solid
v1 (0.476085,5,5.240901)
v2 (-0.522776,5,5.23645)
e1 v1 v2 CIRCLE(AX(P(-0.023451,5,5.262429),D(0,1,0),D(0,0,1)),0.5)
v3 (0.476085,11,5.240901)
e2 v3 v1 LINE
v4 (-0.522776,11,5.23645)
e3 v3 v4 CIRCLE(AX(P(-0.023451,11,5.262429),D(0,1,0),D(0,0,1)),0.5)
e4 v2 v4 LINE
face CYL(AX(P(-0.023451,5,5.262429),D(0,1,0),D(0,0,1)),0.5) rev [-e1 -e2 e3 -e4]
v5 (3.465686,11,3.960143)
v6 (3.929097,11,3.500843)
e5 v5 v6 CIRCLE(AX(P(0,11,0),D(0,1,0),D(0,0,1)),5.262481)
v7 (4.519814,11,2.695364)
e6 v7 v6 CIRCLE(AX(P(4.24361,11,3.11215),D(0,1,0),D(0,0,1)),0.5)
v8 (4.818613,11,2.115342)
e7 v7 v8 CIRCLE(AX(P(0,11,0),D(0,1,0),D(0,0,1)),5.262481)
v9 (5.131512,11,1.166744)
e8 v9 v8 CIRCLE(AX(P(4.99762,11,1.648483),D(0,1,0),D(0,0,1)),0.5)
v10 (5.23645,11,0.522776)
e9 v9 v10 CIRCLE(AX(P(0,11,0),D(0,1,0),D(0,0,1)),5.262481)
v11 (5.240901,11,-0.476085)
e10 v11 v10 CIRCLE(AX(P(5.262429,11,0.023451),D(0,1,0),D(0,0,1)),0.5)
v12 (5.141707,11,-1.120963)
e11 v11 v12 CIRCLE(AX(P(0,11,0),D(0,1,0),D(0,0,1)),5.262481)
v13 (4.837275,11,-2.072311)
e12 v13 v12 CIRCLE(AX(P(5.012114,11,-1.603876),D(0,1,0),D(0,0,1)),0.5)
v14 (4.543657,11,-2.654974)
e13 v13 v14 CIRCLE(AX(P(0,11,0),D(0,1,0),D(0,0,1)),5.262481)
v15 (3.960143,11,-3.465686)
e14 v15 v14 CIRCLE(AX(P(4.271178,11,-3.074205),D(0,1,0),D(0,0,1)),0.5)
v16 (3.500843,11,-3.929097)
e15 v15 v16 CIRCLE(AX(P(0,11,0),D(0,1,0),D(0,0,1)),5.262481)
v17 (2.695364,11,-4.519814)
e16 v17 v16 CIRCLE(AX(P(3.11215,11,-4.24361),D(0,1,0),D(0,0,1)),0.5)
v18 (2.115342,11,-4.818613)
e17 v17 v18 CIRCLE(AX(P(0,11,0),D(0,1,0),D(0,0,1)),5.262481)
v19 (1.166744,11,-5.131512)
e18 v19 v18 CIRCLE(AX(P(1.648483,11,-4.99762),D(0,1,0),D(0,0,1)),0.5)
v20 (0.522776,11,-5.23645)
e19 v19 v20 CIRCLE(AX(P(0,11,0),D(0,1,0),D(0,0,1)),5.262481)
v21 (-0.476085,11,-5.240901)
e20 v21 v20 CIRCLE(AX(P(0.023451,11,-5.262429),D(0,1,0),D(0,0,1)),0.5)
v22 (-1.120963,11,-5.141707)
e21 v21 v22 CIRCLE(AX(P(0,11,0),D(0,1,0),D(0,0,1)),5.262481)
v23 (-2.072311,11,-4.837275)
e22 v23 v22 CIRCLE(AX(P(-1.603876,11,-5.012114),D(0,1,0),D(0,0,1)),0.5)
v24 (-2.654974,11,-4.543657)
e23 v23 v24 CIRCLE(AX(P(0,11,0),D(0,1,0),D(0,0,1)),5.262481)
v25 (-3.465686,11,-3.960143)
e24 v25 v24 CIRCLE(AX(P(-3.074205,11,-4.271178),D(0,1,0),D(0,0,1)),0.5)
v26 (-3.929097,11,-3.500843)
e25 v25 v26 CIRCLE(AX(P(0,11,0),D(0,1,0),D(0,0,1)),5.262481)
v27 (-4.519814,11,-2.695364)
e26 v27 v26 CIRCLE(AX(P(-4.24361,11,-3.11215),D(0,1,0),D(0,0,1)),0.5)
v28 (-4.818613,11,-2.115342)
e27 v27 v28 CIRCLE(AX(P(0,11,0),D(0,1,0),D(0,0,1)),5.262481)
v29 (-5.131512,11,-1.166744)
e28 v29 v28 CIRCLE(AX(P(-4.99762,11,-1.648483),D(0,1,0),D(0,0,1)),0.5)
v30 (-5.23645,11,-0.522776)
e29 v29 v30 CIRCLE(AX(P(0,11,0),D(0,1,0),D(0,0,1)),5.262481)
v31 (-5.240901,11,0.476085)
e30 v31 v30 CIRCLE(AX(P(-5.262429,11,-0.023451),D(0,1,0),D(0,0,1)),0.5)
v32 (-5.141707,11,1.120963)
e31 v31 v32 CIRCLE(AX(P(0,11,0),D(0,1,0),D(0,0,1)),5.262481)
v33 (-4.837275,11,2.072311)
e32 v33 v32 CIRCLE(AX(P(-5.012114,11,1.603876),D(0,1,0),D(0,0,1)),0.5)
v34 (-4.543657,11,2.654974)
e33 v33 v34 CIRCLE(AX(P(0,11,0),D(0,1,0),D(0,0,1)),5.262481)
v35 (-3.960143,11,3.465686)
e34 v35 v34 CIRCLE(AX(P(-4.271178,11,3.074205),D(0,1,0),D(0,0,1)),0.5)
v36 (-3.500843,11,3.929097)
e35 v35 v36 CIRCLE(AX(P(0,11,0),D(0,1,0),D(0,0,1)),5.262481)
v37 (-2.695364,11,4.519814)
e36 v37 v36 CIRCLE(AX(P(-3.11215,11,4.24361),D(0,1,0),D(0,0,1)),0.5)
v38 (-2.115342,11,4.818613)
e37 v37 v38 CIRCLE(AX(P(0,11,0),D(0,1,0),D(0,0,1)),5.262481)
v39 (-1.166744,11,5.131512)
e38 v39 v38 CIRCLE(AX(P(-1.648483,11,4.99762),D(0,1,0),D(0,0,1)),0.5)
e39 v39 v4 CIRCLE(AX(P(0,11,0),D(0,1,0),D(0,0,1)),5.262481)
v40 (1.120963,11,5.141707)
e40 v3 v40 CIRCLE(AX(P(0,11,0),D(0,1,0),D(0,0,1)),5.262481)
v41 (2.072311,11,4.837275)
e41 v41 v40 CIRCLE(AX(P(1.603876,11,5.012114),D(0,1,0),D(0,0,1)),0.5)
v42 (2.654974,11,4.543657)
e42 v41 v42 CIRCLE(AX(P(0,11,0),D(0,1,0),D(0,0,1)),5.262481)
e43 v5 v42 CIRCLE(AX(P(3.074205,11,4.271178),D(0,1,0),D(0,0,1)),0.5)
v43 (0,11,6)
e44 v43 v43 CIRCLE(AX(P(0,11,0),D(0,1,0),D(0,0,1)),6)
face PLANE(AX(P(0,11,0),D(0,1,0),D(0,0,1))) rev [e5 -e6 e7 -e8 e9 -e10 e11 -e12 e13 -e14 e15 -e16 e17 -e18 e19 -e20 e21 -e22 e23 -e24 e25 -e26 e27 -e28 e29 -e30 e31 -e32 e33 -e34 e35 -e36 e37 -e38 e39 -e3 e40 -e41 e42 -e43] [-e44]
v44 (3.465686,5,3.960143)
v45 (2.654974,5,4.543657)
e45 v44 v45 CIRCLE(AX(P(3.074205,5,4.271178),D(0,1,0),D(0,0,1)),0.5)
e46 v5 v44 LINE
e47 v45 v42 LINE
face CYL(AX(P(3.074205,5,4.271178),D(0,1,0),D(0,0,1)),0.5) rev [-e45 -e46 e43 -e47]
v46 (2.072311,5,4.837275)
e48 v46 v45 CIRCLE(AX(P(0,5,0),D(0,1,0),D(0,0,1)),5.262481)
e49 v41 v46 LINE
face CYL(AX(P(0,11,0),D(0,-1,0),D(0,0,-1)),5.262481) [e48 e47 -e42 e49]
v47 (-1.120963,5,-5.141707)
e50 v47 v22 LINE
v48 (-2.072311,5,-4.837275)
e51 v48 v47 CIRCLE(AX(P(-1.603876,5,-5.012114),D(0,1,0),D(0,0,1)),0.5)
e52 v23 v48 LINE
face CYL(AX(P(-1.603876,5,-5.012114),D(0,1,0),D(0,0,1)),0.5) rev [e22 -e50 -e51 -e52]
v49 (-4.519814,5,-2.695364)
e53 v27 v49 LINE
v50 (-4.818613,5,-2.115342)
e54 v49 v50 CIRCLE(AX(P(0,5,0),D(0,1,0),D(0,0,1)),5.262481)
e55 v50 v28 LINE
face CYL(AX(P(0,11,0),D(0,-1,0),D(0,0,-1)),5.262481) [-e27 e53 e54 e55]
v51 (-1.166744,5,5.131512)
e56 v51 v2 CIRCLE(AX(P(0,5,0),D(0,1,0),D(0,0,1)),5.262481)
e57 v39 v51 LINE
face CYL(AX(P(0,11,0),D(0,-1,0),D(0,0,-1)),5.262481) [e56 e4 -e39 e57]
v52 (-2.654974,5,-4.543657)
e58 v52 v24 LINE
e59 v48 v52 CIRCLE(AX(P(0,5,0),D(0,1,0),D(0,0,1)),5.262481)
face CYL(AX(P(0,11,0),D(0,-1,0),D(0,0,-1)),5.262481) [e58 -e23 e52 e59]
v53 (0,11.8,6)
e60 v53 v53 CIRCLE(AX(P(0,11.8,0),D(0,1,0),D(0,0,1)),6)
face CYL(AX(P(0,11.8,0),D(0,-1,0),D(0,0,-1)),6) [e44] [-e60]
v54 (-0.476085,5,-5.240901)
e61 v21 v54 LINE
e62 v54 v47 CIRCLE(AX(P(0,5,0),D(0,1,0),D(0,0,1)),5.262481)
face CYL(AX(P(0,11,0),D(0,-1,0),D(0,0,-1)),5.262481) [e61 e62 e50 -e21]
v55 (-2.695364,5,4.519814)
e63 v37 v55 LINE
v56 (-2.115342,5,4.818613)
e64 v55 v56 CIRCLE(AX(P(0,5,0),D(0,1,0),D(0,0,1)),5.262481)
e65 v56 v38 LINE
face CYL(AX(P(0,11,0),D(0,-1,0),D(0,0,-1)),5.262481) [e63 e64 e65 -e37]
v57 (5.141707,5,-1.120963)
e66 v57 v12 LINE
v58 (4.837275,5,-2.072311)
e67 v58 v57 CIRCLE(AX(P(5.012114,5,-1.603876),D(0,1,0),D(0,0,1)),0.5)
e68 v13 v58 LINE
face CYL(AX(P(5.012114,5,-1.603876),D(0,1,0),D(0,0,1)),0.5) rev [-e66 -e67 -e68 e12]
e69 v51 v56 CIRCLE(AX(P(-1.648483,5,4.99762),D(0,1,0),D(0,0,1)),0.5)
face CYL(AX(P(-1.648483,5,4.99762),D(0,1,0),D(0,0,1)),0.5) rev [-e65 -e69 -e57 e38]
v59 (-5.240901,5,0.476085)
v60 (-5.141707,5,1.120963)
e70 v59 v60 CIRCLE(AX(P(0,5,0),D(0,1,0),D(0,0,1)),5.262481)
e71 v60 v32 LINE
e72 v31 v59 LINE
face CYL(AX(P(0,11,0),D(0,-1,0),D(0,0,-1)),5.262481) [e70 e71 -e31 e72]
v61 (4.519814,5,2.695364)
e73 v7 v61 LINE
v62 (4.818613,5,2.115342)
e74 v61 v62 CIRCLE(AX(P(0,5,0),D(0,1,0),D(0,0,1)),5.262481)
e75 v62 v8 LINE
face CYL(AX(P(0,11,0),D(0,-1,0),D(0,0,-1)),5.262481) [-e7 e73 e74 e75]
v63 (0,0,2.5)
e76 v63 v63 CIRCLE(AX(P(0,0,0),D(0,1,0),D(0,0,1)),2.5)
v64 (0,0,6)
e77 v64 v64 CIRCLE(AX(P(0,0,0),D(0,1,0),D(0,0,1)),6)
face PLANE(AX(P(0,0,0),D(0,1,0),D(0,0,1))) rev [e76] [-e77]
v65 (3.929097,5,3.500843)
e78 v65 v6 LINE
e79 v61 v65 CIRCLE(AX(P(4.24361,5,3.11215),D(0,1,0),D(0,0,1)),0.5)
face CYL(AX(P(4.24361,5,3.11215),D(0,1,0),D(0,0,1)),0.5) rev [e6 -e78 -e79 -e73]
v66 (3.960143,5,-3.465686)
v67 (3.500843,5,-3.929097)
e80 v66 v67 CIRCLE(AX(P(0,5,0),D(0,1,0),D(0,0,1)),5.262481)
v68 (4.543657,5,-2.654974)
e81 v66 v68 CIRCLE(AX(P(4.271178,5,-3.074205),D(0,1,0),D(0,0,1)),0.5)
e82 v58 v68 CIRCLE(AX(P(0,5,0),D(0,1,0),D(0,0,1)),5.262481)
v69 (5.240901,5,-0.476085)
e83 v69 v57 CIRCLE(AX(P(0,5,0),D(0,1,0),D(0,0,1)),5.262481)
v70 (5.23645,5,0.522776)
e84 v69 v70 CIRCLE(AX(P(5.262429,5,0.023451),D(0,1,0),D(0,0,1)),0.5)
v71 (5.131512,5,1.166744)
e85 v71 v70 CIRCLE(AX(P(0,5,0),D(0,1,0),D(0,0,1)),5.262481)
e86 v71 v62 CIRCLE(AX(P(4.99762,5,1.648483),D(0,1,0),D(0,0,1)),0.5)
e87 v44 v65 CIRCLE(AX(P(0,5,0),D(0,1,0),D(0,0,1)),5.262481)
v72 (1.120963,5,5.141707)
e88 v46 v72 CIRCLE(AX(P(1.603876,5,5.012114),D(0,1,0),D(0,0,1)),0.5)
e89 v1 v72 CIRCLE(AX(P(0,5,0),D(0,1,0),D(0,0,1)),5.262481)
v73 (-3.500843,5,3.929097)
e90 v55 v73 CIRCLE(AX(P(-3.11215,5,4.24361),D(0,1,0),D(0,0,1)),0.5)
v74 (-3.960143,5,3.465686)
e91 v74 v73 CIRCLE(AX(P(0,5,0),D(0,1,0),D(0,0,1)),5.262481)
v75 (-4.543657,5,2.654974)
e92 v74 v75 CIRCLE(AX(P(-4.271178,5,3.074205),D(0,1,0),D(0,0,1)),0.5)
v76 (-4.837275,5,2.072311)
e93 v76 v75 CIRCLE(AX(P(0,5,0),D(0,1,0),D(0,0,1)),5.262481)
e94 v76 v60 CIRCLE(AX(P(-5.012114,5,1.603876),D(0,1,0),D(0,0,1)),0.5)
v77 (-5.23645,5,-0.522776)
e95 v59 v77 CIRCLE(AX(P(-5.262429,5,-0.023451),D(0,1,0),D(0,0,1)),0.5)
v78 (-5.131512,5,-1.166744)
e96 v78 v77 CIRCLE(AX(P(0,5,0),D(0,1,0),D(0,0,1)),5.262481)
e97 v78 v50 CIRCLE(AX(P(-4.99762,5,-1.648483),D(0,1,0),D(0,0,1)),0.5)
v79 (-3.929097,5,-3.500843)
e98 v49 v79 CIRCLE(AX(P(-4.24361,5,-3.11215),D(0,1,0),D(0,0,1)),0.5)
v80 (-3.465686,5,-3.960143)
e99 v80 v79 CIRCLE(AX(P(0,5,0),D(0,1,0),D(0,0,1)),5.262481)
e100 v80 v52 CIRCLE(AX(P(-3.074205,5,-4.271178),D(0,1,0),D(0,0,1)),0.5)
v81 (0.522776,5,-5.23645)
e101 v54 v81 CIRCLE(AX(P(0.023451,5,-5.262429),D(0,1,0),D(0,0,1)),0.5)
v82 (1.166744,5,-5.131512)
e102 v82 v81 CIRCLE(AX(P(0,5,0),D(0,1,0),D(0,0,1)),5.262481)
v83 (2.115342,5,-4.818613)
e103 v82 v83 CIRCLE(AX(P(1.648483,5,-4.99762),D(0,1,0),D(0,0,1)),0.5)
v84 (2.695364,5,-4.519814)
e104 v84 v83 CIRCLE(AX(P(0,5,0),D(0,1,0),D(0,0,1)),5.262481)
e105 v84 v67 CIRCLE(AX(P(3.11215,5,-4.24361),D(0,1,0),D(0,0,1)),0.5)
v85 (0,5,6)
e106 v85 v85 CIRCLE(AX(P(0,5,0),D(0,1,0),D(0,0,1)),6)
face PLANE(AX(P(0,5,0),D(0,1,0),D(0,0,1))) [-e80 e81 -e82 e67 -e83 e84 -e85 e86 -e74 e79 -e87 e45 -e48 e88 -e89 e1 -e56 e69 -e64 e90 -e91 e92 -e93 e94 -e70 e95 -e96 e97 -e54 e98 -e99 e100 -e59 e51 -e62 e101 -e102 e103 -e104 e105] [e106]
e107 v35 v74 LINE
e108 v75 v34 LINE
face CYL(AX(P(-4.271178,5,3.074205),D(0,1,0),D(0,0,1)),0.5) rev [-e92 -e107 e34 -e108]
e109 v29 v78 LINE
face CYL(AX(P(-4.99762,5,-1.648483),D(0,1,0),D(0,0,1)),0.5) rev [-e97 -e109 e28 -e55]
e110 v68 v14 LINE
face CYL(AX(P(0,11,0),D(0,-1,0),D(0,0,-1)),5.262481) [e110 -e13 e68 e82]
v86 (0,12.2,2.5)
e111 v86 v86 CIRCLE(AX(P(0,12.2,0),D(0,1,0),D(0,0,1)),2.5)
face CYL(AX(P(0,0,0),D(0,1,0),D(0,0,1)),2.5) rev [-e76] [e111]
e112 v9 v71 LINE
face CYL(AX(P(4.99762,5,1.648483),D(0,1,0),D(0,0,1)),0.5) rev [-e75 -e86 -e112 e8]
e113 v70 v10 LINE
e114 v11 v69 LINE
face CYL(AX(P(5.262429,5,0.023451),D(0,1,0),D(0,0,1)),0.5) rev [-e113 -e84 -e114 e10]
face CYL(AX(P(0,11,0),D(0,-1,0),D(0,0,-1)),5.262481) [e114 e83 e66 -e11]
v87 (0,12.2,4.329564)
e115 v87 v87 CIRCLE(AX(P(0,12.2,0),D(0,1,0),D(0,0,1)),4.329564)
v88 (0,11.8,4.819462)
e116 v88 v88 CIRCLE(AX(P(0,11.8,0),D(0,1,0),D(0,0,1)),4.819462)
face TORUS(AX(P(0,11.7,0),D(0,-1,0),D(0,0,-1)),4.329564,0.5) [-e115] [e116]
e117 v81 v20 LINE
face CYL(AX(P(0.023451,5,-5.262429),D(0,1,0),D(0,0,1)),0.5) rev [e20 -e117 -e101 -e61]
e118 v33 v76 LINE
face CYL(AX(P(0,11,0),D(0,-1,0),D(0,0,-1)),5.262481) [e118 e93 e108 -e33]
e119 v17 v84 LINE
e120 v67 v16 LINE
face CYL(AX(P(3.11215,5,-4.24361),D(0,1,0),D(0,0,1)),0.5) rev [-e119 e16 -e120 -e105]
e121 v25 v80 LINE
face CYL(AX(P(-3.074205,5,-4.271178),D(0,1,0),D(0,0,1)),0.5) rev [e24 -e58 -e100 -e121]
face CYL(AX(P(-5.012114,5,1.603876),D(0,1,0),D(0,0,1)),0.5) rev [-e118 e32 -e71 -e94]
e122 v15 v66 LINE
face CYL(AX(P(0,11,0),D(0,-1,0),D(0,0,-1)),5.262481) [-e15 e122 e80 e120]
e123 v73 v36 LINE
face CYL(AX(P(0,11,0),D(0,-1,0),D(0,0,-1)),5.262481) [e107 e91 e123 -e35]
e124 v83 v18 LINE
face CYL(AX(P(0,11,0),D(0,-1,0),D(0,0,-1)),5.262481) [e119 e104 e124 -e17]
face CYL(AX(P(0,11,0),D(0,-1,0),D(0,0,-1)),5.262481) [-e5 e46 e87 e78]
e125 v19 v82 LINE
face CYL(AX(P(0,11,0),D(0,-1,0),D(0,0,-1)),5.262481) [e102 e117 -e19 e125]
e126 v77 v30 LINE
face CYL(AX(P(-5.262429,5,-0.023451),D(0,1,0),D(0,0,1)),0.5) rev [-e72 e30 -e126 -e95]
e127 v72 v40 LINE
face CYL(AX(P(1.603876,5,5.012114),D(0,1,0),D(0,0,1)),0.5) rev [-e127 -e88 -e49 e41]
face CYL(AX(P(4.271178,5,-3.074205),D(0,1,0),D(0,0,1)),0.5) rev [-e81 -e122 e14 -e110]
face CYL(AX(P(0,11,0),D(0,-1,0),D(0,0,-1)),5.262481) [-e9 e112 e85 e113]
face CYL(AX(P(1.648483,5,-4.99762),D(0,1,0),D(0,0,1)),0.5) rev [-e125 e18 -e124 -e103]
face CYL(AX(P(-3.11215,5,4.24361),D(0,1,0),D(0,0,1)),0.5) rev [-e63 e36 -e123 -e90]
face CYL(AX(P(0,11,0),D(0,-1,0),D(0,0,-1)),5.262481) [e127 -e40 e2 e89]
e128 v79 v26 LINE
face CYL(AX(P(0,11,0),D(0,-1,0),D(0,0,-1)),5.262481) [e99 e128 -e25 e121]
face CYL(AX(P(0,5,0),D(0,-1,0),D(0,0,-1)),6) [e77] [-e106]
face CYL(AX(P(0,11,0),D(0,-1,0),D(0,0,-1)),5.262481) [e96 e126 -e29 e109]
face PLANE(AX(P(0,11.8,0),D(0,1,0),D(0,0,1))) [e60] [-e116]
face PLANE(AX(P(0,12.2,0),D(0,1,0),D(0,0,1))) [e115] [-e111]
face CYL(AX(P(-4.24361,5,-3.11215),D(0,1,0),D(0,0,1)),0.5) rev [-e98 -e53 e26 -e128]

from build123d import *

# Parameters (mm, degrees)
SKETCH1_R           = 6
BOSS_EXTRUDE1_DEPTH = 5
SKETCH2_R           = 5.262480872
BOSS_EXTRUDE2_DEPTH = 6
SKETCH3_R           = 0.5
CUT_EXTRUDE1_DEPTH  = 6
SKETCH4_R           = 6
BOSS_EXTRUDE3_DEPTH = 0.8
SKETCH5_R           = 4.819461856
BOSS_EXTRUDE4_DEPTH = 0.4
FILLET3_R           = 0.5
SKETCH6_R           = 2.5
CUT_EXTRUDE2_DEPTH  = 15.860686391


with BuildPart() as part:
    # Sketch1 → Boss-Extrude1 (new body)
    with BuildSketch(Plane(origin=(0, 0, 0), x_dir=(1, 0, 0), z_dir=(0, 1, 0))):
        with Locations(Location((0, 0, 0), (0, 0, 270))):
            Circle(SKETCH1_R)
    extrude(amount=BOSS_EXTRUDE1_DEPTH)

    # Sketch2 → Boss-Extrude2 (add)
    with BuildSketch(Plane(origin=(0, 5, 0), x_dir=(1, 0, 0), z_dir=(0, 1, 0))):
        with Locations(Location((0, 0, 0), (0, 0, 270))):
            Circle(SKETCH2_R)
    extrude(amount=BOSS_EXTRUDE2_DEPTH)

    # Sketch3 → Cut-Extrude1 (cut)
    with BuildSketch(Plane(origin=(0, 11, 0), x_dir=(1, 0, 0), z_dir=(0, 1, 0))):
        with Locations((-1.603876434, 5.012113856)):
            Circle(SKETCH3_R)
        with Locations((0.023451225, 5.262428619)):
            Circle(SKETCH3_R)
        with Locations((1.648483316, 4.997620202)):
            Circle(SKETCH3_R)
        with Locations((3.112150373, 4.2436099)):
            Circle(SKETCH3_R)
        with Locations((4.271178469, 3.074205493)):
            Circle(SKETCH3_R)
        with Locations((5.012113856, 1.603876434)):
            Circle(SKETCH3_R)
        with Locations((5.262428619, -0.023451225)):
            Circle(SKETCH3_R)
        with Locations((4.997620202, -1.648483316)):
            Circle(SKETCH3_R)
        with Locations((4.2436099, -3.112150373)):
            Circle(SKETCH3_R)
        with Locations((3.074205493, -4.271178469)):
            Circle(SKETCH3_R)
        with Locations((1.603876434, -5.012113856)):
            Circle(SKETCH3_R)
        with Locations((-0.023451225, -5.262428619)):
            Circle(SKETCH3_R)
        with Locations((-1.648483316, -4.997620202)):
            Circle(SKETCH3_R)
        with Locations((-3.112150373, -4.2436099)):
            Circle(SKETCH3_R)
        with Locations((-4.271178469, -3.074205493)):
            Circle(SKETCH3_R)
        with Locations((-5.012113856, -1.603876434)):
            Circle(SKETCH3_R)
        with Locations((-5.262428619, 0.023451225)):
            Circle(SKETCH3_R)
        with Locations((-4.997620202, 1.648483316)):
            Circle(SKETCH3_R)
        with Locations((-4.2436099, 3.112150373)):
            Circle(SKETCH3_R)
        with Locations((-3.074205493, 4.271178469)):
            Circle(SKETCH3_R)
    extrude(amount=-CUT_EXTRUDE1_DEPTH, mode=Mode.SUBTRACT)

    # Sketch4 → Boss-Extrude3 (add)
    with BuildSketch(Plane(origin=(0, 11, 0), x_dir=(1, 0, 0), z_dir=(0, 1, 0))):
        with Locations(Location((0, 0, 0), (0, 0, 270))):
            Circle(SKETCH4_R)
    extrude(amount=BOSS_EXTRUDE3_DEPTH)

    # Sketch5 → Boss-Extrude4 (add)
    with BuildSketch(Plane(origin=(0, 11.8, 0), x_dir=(1, 0, 0), z_dir=(0, 1, 0))):
        with Locations(Location((0, 0, 0), (0, 0, 270))):
            Circle(SKETCH5_R)
    extrude(amount=BOSS_EXTRUDE4_DEPTH)

    # Fillet3
    # the kernel refuses this fillet: 0.5 mm, written as the material it takes off along each edge
    with BuildSketch(Plane(origin=(0, 12.2, 0), x_dir=(0, 0, 1), z_dir=(-1, 0, 0))) as fillet3_piece_1:
        with BuildLine():
            CenterArc((4.329563907, -0.5), FILLET3_R, 11.536959033, 78.463040967)
            Line((4.329563907, 0), (4.329563907, 0.01))
            Line((4.329563907, 0.01), (4.819461856, 0.01))
            Line((4.819461856, 0.01), (4.829461856, 0))
            ThreePointArc((4.829461856, 0), (4.829461856, -0.2), (4.829259815, -0.398))
            Line((4.829259815, -0.398), (4.819461856, -0.4))
        make_face()
    revolve(axis=Axis((0, 12.2, 0), (0, 1, 0)), mode=Mode.SUBTRACT)

    # Sketch6 → Cut-Extrude2 (cut, through all)
    with BuildSketch(Plane(origin=(0, 12.2, 0), x_dir=(1, 0, 0), z_dir=(0, 1, 0))):
        with Locations(Location((0, 0, 0), (0, 0, 270))):
            Circle(SKETCH6_R)
    extrude(amount=-CUT_EXTRUDE2_DEPTH, mode=Mode.SUBTRACT)


solid = part.part
